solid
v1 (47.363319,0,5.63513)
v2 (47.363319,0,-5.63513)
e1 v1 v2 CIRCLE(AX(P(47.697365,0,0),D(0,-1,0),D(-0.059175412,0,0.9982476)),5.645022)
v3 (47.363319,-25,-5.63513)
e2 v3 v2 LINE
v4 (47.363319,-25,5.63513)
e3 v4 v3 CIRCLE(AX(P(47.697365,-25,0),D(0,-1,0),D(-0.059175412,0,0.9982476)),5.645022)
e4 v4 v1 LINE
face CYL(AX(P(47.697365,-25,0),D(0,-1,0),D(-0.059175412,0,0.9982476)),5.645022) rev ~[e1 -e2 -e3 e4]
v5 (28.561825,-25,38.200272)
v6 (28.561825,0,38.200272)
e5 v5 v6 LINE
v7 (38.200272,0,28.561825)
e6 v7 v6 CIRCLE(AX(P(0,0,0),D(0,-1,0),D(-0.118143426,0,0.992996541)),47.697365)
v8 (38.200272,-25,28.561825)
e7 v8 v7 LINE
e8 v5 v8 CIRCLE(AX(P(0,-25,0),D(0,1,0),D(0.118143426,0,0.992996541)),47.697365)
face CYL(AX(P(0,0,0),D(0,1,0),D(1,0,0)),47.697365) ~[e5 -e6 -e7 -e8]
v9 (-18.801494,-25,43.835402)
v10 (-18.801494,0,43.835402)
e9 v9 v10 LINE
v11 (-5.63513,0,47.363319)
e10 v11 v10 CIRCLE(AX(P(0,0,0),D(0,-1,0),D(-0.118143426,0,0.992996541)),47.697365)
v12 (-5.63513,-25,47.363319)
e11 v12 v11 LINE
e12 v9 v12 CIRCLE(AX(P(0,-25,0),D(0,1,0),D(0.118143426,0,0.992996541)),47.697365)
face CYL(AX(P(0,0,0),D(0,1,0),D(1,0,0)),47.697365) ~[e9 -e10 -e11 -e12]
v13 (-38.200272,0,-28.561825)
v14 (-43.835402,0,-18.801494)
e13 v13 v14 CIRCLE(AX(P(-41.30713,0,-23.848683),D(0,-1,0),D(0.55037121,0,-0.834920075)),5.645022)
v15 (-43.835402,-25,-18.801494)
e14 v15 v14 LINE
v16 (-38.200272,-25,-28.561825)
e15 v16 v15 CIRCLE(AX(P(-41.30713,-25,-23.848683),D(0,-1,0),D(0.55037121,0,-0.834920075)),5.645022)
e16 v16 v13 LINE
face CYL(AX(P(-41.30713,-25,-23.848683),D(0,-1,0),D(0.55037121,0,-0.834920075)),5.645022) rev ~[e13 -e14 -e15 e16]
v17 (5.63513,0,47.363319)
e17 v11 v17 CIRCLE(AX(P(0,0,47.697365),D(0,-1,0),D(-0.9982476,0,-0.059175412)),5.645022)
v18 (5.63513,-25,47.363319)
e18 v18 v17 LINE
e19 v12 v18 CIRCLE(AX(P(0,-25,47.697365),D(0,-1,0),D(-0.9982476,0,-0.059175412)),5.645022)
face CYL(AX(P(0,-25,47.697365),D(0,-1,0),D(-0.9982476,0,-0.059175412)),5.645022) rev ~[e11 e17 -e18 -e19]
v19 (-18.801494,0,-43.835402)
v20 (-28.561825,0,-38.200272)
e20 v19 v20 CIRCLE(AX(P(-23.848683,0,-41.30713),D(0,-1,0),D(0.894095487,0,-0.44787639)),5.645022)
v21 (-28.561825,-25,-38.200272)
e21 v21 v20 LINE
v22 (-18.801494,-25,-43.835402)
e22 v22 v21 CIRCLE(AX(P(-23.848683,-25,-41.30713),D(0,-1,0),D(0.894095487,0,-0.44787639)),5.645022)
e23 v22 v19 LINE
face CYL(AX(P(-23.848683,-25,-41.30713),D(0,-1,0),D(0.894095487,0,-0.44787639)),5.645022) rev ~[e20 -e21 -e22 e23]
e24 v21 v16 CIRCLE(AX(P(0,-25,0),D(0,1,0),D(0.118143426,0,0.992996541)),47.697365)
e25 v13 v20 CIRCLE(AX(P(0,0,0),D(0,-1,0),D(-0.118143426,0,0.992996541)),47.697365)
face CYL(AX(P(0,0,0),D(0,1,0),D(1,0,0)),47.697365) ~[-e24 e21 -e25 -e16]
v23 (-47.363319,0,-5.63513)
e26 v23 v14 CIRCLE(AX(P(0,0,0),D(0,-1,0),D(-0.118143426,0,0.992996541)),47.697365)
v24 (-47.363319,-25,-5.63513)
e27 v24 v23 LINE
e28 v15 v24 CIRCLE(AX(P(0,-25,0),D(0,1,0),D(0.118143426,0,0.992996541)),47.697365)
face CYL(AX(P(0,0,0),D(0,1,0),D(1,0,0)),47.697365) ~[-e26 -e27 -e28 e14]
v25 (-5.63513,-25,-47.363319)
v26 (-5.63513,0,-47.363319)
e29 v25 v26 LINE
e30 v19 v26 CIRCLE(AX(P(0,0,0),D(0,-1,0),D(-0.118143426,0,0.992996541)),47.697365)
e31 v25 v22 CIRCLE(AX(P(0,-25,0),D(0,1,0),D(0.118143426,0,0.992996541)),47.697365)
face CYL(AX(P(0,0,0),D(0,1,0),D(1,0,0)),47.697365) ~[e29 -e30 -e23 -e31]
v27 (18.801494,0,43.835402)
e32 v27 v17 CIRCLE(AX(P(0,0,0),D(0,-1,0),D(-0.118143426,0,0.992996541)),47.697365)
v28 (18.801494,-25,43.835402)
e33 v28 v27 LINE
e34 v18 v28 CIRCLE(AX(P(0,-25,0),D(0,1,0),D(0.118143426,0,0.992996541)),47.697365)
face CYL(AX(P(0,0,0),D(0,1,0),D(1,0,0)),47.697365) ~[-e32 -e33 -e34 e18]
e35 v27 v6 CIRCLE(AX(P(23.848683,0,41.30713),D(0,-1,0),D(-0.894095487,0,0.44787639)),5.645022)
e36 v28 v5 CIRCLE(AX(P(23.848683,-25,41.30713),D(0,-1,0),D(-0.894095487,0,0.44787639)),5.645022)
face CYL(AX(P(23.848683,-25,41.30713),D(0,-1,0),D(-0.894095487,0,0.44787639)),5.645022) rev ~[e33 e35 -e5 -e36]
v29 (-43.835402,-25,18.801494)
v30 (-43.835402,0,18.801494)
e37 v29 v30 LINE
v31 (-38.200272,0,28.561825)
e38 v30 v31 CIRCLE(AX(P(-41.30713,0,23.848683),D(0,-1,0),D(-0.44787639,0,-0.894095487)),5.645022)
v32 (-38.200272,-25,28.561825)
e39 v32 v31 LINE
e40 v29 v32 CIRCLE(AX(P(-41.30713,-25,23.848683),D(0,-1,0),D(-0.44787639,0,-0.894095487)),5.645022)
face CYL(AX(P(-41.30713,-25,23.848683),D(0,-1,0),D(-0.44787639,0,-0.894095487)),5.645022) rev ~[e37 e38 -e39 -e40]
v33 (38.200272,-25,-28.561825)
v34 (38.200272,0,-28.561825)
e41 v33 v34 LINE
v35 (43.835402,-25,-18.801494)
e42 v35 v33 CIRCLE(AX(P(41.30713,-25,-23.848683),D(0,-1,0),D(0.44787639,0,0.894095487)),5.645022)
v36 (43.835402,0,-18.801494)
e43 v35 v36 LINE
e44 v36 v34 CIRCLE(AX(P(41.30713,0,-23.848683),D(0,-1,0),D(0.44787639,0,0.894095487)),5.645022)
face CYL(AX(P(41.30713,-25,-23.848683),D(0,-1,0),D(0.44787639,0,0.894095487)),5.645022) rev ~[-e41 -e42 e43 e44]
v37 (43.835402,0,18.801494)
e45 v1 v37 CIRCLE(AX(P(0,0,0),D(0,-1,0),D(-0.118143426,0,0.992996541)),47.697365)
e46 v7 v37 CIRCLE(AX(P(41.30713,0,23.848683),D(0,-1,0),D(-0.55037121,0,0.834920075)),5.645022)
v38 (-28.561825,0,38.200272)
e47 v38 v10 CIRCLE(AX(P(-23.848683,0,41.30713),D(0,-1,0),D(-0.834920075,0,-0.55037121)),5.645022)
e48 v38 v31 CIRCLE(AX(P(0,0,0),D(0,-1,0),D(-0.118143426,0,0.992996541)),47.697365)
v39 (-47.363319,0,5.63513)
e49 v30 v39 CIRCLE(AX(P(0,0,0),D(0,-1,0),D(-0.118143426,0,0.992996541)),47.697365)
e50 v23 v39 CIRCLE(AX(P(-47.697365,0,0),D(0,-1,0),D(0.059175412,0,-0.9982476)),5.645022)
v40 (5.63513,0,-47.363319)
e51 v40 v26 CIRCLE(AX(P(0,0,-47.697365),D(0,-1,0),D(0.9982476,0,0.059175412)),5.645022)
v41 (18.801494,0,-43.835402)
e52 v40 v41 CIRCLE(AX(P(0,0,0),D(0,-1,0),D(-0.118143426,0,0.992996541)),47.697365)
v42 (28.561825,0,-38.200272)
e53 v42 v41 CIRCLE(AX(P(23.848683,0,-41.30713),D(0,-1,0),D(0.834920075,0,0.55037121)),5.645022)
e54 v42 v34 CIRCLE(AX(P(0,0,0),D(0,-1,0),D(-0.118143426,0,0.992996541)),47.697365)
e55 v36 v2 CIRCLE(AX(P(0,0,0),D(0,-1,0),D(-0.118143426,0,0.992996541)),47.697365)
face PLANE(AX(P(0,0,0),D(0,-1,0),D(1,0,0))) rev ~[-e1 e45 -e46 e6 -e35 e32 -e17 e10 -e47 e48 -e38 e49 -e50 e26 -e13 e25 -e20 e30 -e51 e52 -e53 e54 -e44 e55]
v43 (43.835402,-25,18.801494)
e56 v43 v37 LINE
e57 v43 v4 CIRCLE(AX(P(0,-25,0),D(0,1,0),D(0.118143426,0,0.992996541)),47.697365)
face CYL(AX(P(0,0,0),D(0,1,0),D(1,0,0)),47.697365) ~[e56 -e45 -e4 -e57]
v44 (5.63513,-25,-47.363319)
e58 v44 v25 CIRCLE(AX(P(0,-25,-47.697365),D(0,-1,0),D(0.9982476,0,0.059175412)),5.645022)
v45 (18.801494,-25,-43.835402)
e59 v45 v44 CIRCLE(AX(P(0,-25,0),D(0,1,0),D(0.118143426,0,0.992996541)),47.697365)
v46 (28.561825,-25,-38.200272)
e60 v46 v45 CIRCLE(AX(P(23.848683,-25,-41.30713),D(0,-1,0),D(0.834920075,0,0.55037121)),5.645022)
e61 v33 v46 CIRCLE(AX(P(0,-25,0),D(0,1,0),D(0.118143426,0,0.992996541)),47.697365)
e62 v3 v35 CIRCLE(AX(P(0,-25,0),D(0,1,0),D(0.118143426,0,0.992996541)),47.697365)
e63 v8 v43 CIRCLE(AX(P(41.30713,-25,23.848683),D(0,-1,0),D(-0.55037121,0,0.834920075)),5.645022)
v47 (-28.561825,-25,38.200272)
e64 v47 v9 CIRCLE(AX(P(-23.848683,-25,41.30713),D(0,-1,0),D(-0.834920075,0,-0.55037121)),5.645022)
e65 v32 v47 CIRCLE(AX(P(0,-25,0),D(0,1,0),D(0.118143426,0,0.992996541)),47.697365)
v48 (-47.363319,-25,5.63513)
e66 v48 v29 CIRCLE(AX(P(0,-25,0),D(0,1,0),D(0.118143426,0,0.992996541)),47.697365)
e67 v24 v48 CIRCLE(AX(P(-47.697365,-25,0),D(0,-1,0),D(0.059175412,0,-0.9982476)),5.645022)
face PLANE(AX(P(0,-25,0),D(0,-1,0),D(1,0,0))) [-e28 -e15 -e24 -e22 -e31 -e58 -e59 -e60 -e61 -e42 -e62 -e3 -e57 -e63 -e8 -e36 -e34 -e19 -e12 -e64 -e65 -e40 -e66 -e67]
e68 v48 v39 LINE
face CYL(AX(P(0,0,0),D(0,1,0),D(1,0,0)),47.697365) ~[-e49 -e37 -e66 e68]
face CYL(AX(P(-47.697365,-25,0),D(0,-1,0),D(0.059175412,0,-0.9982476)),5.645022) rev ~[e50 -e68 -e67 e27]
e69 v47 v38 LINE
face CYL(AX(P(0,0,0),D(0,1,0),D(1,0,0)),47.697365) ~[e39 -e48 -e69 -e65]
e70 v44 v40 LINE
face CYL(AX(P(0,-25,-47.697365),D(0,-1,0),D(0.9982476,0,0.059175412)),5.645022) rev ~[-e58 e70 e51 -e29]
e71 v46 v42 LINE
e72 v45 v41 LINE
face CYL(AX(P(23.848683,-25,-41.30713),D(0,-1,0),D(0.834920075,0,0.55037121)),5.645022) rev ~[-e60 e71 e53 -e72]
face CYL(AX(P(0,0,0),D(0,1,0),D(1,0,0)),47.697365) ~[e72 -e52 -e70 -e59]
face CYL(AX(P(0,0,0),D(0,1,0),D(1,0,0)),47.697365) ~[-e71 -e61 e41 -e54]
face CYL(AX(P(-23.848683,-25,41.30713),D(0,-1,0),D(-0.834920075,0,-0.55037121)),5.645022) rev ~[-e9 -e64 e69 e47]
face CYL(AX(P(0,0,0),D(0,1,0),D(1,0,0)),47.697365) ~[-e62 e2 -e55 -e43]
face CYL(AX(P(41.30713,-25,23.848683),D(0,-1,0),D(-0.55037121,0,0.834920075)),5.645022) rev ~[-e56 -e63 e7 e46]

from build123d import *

# Parameters (mm, degrees)
F0_R            = 47.6973653994
F1_DEPTH        = 25
F3_DEPTH        = 25
F3_COPIES_COUNT = 12


# Not quite as in the source:
# - a feature of the source that left no trace in its solid (it failed there, or was rolled back) is left out
# - a pattern or mirror of a feature is missing from the dataset's text; its kind, count and spacing are read off the source's solid


with BuildPart() as f1:
    # F0 (on Front) → F1 (new body)
    with BuildSketch(Plane.XZ):
        Circle(F0_R)
    extrude(amount=F1_DEPTH)

    # F2 (on face) → F3 (cut)
    with BuildSketch(Plane.XZ.offset(25)):
        with BuildLine():
            ThreePointArc((5.635130152, 47.3633188683), (0, 47.6973653994), (-5.635130152, 47.3633188683))
            ThreePointArc((-5.635130152, 47.3633188683), (0, 42.0523429092), (5.635130152, 47.3633188683))
        make_face()
    f3 = extrude(amount=-F3_DEPTH, mode=Mode.SUBTRACT)

    # F3_copies: F3 ×12 about axis
    f3_copies_axis = Axis((0, 0, 0), (0, 1, 0))
    for i in range(1, F3_COPIES_COUNT):
        add(f3.rotate(f3_copies_axis, i * 360 / F3_COPIES_COUNT), mode=Mode.SUBTRACT)


solid = f1.part
